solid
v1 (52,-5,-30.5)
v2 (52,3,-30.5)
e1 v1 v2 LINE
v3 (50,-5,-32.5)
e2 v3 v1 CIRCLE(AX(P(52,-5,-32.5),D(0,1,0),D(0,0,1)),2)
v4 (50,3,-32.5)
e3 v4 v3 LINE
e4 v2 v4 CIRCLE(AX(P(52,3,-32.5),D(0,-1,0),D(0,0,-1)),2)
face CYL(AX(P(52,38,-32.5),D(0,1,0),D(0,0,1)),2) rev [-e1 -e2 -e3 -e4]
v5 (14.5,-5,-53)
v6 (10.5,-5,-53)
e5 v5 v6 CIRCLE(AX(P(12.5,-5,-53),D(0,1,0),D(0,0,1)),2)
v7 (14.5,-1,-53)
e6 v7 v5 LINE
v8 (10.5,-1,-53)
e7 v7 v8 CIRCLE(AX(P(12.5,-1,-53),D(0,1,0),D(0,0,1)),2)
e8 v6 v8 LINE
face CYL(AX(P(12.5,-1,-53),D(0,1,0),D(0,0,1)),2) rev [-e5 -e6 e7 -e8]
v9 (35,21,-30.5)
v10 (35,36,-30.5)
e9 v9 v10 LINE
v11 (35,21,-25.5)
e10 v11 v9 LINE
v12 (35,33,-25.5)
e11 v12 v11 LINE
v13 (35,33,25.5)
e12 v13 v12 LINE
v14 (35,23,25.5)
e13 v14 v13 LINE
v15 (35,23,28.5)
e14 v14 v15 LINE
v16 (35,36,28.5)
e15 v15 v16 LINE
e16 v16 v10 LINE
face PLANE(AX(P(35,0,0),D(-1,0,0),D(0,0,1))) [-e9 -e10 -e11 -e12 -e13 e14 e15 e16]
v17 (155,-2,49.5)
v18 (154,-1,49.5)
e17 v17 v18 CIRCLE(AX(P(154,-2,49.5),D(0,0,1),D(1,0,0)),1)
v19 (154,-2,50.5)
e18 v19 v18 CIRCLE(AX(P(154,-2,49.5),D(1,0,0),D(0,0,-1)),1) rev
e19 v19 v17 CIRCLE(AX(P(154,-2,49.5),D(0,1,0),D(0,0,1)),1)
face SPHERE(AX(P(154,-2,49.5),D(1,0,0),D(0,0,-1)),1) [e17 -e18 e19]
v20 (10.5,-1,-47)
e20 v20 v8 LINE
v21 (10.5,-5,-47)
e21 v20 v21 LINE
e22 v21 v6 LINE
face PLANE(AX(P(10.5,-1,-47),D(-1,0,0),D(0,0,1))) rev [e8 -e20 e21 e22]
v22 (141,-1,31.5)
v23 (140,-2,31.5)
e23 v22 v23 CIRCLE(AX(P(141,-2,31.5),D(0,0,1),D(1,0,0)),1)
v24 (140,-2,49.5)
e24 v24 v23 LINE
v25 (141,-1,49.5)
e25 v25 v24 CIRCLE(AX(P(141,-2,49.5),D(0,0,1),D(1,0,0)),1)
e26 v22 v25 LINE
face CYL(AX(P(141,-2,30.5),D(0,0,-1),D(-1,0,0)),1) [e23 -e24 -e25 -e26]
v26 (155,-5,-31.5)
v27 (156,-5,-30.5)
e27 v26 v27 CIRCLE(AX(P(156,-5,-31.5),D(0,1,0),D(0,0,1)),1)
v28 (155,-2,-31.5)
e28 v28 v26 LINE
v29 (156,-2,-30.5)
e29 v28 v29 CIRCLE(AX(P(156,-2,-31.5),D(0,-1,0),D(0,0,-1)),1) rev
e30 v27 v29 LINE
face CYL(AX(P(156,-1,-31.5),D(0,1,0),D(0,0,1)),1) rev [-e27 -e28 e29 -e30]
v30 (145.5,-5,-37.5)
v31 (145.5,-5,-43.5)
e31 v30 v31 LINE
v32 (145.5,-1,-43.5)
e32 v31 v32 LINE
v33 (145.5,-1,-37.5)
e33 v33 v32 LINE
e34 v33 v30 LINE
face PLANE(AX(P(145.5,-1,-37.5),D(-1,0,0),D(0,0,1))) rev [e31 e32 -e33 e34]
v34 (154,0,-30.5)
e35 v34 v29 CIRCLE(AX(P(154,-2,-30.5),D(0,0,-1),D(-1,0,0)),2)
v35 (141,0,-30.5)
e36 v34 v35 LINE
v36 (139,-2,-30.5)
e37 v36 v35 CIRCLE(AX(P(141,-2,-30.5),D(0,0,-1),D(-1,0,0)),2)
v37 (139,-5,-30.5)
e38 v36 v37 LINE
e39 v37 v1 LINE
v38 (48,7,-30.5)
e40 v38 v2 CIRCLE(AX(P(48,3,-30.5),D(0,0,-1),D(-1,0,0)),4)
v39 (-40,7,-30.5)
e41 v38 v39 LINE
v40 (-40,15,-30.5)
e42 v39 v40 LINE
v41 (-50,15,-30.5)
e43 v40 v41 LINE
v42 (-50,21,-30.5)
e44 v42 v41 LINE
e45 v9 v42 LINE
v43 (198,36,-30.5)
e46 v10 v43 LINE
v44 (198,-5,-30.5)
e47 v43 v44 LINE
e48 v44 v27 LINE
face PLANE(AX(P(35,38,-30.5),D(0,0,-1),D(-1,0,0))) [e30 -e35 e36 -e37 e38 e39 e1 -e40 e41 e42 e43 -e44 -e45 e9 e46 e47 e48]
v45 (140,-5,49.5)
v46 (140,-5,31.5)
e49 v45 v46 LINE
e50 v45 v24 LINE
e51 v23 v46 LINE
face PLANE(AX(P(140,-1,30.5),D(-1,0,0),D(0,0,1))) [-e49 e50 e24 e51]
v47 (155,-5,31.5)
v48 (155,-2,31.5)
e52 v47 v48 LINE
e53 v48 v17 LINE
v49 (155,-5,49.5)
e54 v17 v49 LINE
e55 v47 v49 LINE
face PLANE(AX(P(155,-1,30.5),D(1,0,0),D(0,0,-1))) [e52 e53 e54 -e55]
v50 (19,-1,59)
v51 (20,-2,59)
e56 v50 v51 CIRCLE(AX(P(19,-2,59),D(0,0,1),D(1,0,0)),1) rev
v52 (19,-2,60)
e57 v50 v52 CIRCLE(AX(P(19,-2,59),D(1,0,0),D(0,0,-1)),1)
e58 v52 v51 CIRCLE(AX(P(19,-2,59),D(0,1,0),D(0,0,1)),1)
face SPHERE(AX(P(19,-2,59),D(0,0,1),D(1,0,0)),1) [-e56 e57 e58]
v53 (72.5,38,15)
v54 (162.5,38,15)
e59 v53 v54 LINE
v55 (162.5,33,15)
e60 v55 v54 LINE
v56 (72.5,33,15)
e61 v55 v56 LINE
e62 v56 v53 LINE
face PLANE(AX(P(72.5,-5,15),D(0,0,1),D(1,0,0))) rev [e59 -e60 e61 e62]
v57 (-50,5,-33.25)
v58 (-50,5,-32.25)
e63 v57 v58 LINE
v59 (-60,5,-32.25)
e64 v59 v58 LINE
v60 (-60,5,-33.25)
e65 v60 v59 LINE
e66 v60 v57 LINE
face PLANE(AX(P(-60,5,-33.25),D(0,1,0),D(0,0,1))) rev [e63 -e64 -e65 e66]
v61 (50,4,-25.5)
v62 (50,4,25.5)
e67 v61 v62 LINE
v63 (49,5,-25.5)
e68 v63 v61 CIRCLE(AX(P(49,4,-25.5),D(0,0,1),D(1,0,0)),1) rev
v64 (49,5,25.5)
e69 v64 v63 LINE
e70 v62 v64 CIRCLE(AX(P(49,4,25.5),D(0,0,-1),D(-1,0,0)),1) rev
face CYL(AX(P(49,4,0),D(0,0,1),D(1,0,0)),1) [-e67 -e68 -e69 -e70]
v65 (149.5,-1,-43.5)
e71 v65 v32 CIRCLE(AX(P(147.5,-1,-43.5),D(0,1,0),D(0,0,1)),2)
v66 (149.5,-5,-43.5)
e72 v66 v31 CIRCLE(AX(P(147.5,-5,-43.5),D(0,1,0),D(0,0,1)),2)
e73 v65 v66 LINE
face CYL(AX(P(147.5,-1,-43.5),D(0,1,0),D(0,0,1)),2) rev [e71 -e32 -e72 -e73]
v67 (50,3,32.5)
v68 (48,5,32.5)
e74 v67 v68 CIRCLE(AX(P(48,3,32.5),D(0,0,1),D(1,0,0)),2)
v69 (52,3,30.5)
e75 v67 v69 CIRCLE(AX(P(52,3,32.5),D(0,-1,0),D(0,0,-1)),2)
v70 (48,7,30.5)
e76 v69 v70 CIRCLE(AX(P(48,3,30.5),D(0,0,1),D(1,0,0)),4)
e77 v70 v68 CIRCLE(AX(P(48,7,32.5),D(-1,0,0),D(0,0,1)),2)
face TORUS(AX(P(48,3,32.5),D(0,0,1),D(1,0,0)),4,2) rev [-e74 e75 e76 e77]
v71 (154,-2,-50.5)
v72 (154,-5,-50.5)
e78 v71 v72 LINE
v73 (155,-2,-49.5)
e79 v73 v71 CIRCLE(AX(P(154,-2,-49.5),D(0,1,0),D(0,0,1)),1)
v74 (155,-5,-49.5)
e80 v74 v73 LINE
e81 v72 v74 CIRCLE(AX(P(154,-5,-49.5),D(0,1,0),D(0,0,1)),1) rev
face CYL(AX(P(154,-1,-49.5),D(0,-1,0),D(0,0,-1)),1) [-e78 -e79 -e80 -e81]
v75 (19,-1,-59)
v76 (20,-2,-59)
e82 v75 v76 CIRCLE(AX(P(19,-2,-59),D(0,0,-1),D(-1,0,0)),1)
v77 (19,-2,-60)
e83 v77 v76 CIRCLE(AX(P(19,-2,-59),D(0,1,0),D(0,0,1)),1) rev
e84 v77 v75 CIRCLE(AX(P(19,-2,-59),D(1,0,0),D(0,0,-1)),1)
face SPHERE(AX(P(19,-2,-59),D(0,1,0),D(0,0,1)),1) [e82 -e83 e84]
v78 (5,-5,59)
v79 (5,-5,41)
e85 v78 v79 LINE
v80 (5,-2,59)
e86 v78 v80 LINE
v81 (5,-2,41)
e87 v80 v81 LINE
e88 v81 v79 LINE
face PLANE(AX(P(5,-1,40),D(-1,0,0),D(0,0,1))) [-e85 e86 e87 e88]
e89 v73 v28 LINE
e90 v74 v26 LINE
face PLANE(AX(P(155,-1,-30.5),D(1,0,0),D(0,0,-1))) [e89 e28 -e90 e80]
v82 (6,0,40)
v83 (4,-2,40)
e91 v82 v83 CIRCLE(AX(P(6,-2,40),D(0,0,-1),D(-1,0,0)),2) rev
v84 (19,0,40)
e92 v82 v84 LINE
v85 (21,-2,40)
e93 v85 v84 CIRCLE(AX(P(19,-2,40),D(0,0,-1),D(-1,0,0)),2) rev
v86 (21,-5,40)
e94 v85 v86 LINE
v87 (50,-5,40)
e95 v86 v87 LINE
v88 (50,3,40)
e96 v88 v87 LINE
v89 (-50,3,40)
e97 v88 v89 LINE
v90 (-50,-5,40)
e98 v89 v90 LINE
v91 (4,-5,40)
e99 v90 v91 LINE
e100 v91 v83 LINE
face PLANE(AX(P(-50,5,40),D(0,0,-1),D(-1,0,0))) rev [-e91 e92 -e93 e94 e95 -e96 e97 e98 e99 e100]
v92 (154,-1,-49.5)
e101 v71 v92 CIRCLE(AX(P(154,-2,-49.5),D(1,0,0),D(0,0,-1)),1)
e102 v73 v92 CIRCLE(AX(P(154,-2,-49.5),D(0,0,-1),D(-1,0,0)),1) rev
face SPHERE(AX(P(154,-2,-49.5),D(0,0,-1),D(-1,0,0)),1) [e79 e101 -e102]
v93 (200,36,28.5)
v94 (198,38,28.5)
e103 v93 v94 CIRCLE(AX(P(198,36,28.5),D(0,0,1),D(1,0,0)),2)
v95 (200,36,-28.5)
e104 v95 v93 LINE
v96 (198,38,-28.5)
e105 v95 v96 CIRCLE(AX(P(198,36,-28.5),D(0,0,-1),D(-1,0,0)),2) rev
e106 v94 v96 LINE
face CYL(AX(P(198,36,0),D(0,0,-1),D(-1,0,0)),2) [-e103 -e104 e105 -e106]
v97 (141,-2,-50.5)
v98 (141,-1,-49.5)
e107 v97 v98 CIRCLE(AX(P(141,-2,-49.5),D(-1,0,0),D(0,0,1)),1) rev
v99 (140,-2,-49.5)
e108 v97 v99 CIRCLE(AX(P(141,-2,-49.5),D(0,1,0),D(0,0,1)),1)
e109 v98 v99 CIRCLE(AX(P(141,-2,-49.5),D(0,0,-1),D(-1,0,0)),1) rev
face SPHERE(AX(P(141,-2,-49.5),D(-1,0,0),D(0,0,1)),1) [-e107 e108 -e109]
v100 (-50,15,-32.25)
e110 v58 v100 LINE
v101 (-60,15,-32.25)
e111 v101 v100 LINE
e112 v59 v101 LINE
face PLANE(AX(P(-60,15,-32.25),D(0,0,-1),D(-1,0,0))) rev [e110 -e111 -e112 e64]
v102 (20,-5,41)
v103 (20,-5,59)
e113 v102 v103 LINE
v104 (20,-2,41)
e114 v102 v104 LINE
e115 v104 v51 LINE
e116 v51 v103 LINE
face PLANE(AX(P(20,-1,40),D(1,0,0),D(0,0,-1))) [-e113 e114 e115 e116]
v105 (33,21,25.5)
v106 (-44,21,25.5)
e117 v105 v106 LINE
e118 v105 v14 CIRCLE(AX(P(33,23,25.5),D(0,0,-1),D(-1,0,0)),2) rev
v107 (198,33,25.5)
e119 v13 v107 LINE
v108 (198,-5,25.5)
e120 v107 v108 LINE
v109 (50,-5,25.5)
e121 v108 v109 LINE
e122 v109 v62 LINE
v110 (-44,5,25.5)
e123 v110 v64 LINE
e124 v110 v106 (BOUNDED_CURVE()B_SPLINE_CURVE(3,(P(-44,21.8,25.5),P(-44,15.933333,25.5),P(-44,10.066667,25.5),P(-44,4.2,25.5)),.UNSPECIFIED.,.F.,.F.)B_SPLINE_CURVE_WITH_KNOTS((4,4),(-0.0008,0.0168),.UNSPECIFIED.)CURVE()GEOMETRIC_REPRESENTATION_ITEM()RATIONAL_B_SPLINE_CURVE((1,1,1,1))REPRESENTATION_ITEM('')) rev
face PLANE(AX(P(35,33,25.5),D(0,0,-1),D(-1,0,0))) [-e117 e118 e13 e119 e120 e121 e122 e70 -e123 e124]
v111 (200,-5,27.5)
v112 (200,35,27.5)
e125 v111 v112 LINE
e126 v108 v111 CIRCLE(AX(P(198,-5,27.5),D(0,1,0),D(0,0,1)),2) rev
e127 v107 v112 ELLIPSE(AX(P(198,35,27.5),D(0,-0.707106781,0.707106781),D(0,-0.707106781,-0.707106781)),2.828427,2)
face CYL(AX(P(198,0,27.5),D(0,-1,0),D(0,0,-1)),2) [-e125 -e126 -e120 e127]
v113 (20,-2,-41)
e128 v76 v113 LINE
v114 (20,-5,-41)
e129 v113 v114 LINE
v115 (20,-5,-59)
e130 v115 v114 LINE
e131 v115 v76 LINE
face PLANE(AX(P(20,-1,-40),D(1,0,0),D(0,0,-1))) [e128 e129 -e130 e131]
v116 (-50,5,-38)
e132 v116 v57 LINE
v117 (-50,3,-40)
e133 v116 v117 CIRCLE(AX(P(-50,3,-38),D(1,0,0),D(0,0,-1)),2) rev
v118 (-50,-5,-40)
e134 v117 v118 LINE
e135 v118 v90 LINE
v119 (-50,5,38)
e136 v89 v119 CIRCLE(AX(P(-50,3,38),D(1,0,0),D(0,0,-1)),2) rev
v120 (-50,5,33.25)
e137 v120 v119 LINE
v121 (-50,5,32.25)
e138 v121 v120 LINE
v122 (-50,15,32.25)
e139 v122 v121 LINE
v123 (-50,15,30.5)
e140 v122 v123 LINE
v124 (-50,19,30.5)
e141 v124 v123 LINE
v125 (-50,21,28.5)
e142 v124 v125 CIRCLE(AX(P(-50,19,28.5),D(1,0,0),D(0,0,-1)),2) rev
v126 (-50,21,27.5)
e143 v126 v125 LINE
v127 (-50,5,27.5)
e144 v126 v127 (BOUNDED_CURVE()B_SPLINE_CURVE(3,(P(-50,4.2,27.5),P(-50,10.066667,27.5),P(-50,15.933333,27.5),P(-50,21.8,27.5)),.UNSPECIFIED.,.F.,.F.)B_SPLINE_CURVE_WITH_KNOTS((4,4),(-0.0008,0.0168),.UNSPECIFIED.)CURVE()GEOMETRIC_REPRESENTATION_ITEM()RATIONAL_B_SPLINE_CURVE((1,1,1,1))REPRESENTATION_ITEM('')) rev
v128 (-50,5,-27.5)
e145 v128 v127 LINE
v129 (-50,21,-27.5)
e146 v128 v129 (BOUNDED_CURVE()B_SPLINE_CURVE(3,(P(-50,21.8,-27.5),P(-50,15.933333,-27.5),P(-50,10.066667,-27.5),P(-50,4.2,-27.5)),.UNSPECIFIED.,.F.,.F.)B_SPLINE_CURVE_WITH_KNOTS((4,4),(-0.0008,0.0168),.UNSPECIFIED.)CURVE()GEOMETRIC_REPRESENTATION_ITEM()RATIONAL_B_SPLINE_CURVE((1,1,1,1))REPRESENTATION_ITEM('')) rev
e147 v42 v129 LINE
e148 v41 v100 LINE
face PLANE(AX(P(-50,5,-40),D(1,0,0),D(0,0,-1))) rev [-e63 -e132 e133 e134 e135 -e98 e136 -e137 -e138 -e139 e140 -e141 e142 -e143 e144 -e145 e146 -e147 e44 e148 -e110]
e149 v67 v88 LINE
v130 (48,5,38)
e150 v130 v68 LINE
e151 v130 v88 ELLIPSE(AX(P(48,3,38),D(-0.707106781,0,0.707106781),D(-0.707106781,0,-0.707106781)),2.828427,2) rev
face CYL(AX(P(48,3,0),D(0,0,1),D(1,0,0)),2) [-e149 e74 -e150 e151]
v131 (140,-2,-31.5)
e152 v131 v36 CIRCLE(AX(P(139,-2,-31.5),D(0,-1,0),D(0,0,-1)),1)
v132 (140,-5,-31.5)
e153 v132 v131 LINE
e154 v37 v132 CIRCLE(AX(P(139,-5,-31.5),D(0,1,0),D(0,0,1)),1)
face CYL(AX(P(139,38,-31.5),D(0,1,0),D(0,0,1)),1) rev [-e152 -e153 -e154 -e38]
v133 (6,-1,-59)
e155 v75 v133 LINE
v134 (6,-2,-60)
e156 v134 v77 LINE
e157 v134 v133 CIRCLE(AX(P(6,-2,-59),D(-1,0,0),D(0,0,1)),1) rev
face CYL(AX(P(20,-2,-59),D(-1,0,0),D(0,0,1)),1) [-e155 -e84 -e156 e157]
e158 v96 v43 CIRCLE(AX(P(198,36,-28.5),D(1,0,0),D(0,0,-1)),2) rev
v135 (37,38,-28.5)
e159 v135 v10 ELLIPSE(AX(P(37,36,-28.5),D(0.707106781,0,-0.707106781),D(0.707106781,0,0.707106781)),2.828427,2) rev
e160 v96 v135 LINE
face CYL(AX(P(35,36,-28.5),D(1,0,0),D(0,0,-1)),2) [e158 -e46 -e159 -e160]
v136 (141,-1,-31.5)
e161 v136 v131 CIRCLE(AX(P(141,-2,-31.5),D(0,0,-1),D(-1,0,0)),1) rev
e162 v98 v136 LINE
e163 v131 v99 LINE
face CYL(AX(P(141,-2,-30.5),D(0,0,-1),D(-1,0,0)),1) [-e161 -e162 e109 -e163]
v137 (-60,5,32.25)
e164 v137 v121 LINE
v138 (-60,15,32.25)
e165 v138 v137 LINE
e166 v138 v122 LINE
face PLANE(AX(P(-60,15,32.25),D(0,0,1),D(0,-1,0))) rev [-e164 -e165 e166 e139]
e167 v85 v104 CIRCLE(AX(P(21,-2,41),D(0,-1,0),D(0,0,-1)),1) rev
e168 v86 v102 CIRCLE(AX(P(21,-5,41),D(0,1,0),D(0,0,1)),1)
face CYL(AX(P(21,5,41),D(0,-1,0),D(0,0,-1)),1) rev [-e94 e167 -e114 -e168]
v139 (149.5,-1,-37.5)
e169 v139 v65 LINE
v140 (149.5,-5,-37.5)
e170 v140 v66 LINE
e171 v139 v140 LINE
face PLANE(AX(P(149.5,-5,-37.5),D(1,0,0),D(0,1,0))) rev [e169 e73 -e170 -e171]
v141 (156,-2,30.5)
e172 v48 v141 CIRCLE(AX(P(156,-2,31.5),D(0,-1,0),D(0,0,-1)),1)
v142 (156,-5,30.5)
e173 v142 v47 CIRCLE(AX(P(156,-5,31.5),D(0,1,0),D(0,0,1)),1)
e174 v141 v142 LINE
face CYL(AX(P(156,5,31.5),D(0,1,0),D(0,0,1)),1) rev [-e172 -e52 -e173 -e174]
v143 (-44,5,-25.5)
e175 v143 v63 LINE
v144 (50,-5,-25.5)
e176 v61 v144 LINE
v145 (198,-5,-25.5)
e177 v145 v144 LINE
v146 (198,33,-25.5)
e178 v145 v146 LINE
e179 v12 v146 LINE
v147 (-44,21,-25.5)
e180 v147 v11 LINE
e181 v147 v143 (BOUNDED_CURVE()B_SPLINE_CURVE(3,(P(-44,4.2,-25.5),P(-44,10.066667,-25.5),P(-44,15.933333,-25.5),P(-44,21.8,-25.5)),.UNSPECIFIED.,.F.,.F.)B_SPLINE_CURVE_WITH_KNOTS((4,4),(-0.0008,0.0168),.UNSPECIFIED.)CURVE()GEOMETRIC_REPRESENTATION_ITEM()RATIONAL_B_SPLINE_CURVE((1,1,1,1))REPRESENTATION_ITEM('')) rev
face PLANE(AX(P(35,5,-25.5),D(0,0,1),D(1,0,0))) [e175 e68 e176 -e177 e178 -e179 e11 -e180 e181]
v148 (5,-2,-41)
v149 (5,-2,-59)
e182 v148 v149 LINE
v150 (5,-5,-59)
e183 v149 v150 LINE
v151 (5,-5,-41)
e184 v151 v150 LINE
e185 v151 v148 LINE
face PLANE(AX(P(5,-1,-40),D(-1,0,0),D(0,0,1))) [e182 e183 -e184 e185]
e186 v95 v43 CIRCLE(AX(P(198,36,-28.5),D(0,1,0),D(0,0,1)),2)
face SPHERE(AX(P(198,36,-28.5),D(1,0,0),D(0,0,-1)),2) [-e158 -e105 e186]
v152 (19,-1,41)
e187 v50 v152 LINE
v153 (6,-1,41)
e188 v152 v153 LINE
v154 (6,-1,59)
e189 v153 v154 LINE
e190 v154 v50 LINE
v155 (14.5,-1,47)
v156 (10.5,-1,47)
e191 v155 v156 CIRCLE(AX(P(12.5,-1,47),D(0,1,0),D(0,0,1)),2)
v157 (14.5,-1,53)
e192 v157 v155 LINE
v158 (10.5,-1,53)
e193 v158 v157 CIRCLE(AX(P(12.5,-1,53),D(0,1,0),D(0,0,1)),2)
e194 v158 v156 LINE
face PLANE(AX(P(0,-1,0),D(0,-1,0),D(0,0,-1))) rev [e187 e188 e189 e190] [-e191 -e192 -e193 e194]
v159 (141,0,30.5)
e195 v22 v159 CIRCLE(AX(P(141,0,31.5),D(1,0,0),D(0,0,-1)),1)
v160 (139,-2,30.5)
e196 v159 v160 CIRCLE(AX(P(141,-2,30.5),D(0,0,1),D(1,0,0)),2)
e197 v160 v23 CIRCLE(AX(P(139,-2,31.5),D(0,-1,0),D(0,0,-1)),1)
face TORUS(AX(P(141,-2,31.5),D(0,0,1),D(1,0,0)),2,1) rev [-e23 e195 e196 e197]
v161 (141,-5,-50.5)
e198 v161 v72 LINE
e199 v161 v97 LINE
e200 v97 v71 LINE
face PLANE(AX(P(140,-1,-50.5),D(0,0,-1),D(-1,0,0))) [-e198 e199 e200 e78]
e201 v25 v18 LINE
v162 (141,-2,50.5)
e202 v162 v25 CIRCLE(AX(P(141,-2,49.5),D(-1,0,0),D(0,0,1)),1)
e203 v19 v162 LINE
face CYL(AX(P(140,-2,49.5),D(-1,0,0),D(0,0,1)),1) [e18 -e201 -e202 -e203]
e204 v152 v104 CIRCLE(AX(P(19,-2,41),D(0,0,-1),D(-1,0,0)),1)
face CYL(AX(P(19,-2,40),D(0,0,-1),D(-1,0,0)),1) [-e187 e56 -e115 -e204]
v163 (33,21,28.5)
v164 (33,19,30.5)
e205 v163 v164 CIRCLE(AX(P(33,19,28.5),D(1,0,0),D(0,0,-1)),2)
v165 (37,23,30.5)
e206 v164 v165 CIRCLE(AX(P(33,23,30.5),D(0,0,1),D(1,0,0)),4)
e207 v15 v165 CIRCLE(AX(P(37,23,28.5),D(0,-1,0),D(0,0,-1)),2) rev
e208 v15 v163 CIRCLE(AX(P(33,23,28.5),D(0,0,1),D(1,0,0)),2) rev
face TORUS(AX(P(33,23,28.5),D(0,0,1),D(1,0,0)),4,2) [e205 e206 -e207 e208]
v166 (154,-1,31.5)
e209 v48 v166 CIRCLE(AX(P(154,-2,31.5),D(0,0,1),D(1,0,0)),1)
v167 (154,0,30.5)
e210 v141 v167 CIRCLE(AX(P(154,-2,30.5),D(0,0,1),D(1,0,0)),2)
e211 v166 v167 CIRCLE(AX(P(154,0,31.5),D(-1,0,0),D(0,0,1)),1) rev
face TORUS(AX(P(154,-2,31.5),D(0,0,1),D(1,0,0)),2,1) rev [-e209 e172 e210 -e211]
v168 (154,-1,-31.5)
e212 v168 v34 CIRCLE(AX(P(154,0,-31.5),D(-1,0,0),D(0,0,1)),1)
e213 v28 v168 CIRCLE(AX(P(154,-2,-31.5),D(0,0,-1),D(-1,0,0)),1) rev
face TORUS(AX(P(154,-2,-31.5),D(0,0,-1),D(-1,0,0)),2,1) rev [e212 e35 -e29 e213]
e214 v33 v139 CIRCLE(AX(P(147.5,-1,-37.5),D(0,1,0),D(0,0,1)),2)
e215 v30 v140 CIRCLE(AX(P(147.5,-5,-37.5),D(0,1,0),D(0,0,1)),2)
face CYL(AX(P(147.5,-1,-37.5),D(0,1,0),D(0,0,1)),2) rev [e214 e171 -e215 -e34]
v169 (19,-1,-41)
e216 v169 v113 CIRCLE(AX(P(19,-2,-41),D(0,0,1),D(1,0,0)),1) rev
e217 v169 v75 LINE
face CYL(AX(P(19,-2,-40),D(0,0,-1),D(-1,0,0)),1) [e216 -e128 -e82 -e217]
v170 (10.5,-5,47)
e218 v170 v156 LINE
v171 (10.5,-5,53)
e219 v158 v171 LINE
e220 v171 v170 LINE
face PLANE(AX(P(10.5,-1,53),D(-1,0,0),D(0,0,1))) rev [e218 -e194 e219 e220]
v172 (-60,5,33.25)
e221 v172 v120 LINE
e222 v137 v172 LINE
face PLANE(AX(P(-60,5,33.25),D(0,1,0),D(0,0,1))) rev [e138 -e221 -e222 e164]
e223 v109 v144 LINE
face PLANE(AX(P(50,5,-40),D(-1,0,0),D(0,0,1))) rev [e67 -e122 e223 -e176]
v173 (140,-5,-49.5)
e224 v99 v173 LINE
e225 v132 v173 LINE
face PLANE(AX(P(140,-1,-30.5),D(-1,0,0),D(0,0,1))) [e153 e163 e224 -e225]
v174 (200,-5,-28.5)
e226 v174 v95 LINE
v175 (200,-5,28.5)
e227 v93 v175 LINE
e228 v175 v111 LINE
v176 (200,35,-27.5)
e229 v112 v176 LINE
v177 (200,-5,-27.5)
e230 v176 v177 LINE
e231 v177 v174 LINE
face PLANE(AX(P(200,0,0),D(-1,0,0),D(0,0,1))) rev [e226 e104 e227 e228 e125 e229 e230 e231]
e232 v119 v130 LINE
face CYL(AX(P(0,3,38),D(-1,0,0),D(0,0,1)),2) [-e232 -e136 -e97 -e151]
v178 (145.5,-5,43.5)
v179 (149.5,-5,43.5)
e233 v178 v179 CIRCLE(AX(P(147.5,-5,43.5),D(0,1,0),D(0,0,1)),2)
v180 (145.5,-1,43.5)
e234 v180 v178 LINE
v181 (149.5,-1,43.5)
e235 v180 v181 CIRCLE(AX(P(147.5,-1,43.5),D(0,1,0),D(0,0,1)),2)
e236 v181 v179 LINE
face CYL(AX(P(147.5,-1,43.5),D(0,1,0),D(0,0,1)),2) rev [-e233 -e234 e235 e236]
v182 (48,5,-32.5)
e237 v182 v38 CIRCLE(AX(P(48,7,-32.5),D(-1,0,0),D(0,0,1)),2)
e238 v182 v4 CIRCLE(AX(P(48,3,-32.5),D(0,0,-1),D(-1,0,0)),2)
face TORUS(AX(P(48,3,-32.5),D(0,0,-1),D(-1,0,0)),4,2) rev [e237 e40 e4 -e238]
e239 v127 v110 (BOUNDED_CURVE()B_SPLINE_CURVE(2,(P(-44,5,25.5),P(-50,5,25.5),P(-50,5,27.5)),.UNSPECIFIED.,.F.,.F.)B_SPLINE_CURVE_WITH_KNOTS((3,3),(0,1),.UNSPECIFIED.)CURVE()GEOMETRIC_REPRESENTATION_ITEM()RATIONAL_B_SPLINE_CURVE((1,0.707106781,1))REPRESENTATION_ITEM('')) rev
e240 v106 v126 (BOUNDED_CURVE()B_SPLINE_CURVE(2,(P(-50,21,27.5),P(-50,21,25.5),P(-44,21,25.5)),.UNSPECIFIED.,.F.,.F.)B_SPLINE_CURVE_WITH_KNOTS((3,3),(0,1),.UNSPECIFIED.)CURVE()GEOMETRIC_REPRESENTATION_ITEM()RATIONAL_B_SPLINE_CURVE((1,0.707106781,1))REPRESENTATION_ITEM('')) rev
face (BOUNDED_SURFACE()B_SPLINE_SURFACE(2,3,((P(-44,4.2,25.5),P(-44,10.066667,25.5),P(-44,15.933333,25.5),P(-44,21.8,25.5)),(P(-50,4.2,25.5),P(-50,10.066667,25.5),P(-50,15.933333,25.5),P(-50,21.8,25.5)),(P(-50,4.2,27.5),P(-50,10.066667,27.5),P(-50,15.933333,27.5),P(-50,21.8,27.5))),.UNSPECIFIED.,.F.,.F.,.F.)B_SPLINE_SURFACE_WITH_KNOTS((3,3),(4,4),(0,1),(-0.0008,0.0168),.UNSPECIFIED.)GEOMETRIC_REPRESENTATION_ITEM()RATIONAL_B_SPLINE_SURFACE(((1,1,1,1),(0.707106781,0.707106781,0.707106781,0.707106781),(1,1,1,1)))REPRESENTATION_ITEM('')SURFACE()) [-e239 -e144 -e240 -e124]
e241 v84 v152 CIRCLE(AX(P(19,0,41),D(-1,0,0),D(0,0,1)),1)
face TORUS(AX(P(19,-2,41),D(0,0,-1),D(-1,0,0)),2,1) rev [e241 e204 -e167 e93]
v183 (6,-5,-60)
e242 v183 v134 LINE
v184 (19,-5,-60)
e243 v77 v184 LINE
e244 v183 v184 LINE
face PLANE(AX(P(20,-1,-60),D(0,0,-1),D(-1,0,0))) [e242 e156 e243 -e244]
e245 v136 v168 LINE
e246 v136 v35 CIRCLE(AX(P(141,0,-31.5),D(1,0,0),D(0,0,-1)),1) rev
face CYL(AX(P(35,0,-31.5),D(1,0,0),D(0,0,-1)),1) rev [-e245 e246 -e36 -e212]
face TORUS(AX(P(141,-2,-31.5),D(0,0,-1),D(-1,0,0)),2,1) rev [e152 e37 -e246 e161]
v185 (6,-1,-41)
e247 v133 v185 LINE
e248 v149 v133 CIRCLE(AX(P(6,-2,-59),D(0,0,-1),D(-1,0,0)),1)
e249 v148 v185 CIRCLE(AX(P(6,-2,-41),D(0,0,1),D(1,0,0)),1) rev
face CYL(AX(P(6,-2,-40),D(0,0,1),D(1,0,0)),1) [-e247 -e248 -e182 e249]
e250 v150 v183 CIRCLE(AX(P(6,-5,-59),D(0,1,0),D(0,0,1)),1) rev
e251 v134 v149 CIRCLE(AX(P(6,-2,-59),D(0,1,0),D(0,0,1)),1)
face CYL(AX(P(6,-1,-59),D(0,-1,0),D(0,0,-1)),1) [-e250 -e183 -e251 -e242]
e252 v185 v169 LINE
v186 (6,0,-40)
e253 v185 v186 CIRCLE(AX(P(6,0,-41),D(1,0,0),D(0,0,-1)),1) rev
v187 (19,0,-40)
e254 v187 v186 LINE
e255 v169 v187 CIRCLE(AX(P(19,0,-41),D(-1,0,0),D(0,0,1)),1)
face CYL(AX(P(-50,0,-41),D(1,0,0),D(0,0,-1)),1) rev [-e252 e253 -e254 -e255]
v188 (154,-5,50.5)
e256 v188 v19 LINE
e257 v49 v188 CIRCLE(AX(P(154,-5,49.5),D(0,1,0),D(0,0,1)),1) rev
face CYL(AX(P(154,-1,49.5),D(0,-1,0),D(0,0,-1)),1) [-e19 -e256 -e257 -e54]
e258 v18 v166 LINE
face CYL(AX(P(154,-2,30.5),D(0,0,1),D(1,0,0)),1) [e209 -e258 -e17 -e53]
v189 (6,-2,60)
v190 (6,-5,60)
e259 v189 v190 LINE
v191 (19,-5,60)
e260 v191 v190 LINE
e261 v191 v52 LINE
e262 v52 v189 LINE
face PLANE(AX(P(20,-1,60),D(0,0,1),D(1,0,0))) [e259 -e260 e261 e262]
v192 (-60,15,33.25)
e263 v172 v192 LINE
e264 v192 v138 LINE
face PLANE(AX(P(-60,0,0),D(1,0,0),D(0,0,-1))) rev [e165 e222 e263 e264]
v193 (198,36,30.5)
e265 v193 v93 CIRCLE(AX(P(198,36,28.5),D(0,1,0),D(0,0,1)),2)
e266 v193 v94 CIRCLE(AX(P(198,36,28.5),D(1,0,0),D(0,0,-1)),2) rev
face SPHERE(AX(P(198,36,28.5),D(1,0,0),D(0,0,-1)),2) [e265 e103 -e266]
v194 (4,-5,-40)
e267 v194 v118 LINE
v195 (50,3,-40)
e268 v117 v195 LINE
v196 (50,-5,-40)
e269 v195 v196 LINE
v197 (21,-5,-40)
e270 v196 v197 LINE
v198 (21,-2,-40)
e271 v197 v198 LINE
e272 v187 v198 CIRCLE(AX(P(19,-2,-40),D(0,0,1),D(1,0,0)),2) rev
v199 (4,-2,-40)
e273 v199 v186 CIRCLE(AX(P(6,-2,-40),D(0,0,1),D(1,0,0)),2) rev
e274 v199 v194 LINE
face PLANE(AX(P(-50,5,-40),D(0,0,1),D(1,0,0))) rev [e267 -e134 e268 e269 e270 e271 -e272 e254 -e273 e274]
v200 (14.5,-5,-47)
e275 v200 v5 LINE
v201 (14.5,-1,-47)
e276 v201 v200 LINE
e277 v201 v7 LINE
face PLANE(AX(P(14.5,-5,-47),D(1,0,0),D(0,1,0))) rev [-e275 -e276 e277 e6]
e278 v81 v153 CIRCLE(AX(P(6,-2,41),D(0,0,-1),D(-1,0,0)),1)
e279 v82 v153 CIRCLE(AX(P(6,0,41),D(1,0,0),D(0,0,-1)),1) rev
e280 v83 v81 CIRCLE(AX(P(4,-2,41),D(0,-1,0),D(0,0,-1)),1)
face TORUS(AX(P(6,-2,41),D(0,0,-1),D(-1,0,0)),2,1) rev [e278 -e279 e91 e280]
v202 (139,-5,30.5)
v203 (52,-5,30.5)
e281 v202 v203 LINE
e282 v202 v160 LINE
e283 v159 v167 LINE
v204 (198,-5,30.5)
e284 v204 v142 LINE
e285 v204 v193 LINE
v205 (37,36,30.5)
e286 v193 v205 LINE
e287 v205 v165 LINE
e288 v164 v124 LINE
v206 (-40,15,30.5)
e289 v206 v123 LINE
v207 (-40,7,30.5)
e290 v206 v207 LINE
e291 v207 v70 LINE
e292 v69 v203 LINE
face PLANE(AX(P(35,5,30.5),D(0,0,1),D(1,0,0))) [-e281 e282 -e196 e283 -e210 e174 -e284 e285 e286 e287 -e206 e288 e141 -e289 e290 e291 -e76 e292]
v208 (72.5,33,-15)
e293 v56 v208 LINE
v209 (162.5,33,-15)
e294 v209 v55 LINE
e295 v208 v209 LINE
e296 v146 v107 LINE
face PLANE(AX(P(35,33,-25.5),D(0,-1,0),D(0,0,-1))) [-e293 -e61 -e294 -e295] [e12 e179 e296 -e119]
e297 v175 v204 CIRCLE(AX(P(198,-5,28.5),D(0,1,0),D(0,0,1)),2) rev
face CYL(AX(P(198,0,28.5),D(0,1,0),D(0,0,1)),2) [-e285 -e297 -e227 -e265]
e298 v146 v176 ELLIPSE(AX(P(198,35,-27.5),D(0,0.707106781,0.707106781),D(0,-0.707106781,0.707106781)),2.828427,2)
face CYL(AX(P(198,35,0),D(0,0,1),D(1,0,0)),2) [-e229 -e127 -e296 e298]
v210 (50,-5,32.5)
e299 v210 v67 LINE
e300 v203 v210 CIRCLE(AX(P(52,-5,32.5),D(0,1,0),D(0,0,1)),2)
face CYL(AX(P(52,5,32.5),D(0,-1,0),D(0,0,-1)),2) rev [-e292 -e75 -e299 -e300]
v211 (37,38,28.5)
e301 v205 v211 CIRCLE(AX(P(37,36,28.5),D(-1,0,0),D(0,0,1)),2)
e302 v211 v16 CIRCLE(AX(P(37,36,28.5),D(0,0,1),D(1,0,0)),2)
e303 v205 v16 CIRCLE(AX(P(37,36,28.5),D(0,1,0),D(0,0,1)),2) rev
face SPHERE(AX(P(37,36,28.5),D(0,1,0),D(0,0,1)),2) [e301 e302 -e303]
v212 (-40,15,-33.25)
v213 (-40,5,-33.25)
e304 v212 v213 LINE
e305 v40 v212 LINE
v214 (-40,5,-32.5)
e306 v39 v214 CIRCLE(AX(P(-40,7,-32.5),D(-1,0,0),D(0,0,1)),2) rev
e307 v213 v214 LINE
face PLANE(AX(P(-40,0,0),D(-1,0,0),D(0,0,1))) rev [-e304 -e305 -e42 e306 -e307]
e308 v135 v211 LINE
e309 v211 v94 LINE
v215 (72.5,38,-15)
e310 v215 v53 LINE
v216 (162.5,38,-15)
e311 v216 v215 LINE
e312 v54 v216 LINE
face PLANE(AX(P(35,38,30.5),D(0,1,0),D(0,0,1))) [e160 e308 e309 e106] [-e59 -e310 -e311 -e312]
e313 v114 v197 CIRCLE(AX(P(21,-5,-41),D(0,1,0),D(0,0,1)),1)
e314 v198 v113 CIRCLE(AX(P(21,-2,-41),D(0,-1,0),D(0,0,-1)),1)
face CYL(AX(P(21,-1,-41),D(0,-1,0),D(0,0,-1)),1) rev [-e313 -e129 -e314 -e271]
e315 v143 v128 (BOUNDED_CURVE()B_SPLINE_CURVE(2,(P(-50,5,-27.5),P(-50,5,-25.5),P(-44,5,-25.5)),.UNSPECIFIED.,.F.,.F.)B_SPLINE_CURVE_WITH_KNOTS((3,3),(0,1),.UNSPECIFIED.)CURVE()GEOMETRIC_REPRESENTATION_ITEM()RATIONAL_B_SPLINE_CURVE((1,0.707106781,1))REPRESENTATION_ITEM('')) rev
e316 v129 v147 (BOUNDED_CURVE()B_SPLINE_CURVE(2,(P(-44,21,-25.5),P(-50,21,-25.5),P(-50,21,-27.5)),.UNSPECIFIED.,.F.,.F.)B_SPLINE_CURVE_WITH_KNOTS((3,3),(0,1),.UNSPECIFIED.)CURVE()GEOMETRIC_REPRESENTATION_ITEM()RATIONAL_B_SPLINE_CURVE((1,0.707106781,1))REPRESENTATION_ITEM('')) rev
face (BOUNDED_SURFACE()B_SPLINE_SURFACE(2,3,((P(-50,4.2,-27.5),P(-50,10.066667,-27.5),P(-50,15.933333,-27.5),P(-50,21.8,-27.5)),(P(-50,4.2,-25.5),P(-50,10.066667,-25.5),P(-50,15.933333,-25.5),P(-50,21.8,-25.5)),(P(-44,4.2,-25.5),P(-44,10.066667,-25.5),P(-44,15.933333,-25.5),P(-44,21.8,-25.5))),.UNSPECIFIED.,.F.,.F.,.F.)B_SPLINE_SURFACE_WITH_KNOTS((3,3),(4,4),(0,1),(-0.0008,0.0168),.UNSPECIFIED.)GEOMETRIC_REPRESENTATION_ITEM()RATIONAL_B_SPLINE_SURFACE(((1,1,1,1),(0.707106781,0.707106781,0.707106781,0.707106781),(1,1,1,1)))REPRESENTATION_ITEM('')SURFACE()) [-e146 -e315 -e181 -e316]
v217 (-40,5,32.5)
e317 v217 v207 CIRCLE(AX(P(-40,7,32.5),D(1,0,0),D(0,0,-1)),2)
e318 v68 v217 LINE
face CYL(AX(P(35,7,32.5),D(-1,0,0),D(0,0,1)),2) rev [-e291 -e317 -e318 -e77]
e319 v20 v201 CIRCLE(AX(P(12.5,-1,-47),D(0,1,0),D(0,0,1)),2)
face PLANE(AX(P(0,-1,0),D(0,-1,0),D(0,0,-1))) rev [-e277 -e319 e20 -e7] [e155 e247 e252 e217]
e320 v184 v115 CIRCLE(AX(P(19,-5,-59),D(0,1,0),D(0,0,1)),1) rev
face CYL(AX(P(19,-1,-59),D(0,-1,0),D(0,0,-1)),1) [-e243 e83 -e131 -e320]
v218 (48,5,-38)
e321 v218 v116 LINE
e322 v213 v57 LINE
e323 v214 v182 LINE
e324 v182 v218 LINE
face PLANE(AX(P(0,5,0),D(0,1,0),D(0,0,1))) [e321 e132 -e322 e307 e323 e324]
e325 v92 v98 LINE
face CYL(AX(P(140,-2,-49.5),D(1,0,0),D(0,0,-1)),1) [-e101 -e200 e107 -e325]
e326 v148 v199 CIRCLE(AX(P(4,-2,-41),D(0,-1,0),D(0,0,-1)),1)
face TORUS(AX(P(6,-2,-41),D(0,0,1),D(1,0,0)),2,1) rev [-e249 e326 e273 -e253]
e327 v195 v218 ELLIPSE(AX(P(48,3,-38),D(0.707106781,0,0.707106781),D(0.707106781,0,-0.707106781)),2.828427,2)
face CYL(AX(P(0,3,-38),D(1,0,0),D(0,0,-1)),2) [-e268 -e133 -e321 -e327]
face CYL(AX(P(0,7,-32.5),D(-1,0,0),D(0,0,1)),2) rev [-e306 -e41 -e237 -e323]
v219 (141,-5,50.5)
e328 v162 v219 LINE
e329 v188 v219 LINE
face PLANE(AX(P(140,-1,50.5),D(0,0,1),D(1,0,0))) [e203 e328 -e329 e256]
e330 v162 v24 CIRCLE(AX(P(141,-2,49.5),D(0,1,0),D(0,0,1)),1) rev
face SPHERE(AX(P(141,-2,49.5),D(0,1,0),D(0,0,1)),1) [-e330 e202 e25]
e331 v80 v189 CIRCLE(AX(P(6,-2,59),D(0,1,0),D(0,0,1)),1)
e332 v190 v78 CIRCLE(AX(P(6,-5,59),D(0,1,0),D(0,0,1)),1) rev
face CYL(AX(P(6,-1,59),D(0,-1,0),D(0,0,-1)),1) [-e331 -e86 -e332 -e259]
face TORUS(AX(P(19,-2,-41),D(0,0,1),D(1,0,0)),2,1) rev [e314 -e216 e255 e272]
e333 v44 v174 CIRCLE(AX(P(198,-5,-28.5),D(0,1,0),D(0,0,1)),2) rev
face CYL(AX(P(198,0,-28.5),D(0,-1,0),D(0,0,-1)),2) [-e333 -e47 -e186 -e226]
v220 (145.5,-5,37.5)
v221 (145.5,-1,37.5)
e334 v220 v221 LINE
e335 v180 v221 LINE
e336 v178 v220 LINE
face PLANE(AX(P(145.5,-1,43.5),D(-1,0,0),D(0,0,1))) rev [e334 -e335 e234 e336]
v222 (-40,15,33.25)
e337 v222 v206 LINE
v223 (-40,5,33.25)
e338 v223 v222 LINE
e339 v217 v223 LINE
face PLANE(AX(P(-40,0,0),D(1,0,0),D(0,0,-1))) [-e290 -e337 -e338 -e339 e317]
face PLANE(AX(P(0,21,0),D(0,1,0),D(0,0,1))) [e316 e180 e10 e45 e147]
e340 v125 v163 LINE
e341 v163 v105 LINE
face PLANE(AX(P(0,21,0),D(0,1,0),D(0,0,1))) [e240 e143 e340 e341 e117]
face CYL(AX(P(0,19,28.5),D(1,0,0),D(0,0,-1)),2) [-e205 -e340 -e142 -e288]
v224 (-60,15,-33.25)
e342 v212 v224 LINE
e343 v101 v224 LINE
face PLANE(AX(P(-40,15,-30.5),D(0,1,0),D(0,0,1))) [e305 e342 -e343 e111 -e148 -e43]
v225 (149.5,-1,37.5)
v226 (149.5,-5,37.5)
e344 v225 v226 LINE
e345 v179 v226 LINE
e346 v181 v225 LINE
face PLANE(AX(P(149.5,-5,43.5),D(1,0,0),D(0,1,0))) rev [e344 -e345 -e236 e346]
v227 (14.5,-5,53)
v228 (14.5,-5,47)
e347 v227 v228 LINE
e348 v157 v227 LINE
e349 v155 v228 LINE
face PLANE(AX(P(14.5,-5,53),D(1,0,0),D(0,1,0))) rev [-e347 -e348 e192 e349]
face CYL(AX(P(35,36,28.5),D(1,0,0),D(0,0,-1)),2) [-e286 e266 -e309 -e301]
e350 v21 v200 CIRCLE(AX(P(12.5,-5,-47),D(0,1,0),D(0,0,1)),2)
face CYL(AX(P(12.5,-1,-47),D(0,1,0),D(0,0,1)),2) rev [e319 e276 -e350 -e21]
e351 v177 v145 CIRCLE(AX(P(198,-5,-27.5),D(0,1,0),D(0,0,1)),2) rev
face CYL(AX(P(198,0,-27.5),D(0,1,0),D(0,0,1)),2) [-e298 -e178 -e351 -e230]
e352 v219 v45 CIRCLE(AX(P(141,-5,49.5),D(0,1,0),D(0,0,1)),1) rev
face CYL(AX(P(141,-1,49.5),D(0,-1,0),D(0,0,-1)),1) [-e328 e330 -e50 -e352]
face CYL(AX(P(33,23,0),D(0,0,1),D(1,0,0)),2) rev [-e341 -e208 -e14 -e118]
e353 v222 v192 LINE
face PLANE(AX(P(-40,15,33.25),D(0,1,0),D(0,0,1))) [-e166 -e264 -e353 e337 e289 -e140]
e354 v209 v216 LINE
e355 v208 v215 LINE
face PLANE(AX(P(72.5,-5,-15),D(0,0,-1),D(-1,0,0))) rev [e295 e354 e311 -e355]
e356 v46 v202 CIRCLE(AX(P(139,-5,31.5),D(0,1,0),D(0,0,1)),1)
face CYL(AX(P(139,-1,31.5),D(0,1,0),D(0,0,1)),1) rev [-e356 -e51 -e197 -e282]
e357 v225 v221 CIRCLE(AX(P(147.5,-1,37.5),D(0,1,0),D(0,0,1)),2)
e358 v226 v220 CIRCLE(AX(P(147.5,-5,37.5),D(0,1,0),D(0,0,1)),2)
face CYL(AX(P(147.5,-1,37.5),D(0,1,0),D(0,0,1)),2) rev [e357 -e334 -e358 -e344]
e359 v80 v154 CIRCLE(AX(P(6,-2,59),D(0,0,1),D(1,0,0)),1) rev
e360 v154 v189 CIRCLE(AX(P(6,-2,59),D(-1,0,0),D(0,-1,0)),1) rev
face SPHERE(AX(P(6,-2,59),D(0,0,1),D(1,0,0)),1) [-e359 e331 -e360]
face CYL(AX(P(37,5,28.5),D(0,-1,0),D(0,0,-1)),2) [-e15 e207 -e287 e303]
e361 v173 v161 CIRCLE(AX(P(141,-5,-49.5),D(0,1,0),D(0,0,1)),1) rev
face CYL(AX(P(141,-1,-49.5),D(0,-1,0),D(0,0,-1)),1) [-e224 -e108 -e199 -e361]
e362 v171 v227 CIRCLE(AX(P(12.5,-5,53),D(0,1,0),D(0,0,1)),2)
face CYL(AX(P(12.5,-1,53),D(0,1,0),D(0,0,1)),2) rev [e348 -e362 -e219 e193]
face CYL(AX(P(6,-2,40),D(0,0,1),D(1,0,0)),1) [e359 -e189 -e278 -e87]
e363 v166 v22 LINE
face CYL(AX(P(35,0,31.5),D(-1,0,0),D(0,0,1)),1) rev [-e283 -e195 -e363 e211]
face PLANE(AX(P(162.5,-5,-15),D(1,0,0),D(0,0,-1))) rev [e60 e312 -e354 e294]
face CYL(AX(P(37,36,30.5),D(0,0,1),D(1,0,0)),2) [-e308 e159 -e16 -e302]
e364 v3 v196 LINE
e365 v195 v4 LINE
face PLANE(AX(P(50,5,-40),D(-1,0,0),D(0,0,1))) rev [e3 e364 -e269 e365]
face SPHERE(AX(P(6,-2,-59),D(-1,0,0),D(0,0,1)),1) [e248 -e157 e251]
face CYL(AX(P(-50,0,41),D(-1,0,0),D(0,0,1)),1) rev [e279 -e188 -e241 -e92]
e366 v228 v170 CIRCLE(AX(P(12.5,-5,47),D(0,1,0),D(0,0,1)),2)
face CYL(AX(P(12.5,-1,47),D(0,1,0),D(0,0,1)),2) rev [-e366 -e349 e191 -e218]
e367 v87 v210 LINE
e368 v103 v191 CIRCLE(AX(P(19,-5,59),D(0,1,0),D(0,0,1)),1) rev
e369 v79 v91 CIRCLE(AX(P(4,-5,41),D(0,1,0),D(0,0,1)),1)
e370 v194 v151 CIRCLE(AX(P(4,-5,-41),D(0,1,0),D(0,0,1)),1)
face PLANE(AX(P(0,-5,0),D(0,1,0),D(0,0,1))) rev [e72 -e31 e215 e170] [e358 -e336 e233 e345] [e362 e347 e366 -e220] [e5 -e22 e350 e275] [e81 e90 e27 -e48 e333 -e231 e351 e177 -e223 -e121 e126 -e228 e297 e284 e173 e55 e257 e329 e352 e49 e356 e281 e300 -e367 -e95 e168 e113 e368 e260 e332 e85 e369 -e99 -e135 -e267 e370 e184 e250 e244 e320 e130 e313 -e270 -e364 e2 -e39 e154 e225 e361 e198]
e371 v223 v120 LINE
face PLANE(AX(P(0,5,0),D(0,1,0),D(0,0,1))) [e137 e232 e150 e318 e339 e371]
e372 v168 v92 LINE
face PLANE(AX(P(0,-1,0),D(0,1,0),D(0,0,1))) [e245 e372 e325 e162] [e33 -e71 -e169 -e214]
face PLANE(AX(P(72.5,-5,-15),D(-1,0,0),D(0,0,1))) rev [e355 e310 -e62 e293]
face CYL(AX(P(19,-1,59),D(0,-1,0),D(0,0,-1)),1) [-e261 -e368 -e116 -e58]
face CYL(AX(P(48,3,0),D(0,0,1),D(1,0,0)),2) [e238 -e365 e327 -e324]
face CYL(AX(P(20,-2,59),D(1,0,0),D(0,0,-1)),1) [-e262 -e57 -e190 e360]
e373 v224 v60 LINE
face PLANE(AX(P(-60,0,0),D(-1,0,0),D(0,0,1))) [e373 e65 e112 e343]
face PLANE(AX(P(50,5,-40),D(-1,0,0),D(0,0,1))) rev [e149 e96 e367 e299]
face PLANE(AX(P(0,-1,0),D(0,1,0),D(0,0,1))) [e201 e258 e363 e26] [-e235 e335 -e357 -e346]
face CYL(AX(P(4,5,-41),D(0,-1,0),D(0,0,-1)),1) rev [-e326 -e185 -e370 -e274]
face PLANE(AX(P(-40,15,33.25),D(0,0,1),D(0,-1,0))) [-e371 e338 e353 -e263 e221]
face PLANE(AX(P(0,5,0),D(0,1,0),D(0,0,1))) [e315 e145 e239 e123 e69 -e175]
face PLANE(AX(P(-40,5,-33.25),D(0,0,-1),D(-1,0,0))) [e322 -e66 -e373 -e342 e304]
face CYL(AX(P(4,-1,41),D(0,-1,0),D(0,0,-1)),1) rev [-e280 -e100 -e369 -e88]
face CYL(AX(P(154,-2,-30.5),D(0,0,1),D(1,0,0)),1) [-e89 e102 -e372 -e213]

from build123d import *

# Parameters (mm, degrees)
SKETCH1_W                 = 100
SKETCH1_H                 = 80
BOSS_EXTRUDE1_DEPTH       = 5
BOSS_EXTRUDE2_DEPTH       = 15
BOSS_EXTRUDE4_DEPTH       = 150
SKETCH9_W                 = 85
SKETCH9_H                 = 5
BOSS_EXTRUDE5_DEPTH       = 16
SKETCH3_W                 = 15
SKETCH3_H                 = 20
BOSS_EXTRUDE3_DEPTH       = 4
F_4_0MM_START             = -5
F_4_0MM_DOWEL_SLOT1_DEPTH = 4
SKETCH12_W                = 2.75
SKETCH12_H                = 10
BOSS_EXTRUDE7_DEPTH       = 10
SKETCH13_W                = 1
SKETCH13_H                = 10
BOSS_EXTRUDE8_DEPTH       = 10
SKETCH14_W                = 90
SKETCH14_H                = 30
CUT_EXTRUDE1_DEPTH        = 214.187710715
FILLET2_R                 = 2
FILLET3_R                 = 1
FILLET4_SIZE              = 2
FILLET4_SIZE_2            = 6


# Read off the part's stored shape, not the designer's step: Ø4.0mm Dowel Slot1
with BuildPart() as part:
    # Sketch1 → Boss-Extrude1 (new, symmetric)
    with BuildSketch(Plane(origin=(0, 0, 0), x_dir=(1, 0, 0), z_dir=(0, 1, 0))):
        Rectangle(SKETCH1_W, SKETCH1_H)
    extrude(amount=BOSS_EXTRUDE1_DEPTH, both=True)

    # Sketch2 → Boss-Extrude2 (add)
    with BuildSketch(Plane(origin=(50, 0, 0), x_dir=(0, 0, -1), z_dir=(1, 0, 0))):
        Polygon((-30.5, 5), (-30.5, 38), (30.5, 38), (30.5, 5), (25.5, 5), (25.5, 33), (-25.5, 33), (-25.5, 5), align=None)
    extrude(amount=-BOSS_EXTRUDE2_DEPTH)

    # Sketch4 → Boss-Extrude4 (add)
    with BuildSketch(Plane(origin=(50, 0, 0), x_dir=(0, 0, -1), z_dir=(1, 0, 0))):
        Polygon((-30.5, 38), (30.5, 38), (30.5, -5), (25.5, -5), (25.5, 33), (-25.5, 33), (-25.5, -5), (-30.5, -5), align=None)
    extrude(amount=BOSS_EXTRUDE4_DEPTH)

    # Sketch9 → Boss-Extrude5 (add)
    with BuildSketch(Plane(origin=(0, 5, 0), x_dir=(1, 0, 0), z_dir=(0, 1, 0))):
        with Locations((-7.5, -28)):
            Rectangle(SKETCH9_W, SKETCH9_H)
        with Locations((-7.5, 28)):
            Rectangle(SKETCH9_W, SKETCH9_H)
    extrude(amount=BOSS_EXTRUDE5_DEPTH)

    # Sketch3 → Boss-Extrude3 (add)
    with BuildSketch(Plane.XZ.offset(5)):
        with Locations((12.5, 50)):
            Rectangle(SKETCH3_W, SKETCH3_H)
        with Locations((147.5, 40.5)):
            Rectangle(SKETCH3_W, SKETCH3_H)
        with Locations((147.5, -40.5)):
            Rectangle(SKETCH3_W, SKETCH3_H)
        with Locations((12.5, -50)):
            Rectangle(SKETCH3_W, SKETCH3_H)
    extrude(amount=-BOSS_EXTRUDE3_DEPTH)

    # Ø4.0mm Dowel Slot1 outline → Ø4.0mm Dowel Slot1 (cut)
    with BuildSketch(Plane(origin=(0, 0, 0), x_dir=(1, 0, 0), z_dir=(0, 1, 0)).offset(F_4_0MM_START)):
        with BuildLine():
            Line((149.5, 37.5), (149.5, 43.5))
            ThreePointArc((149.5, 43.5), (147.5, 45.5), (145.5, 43.5))
            Line((145.5, 43.5), (145.5, 37.5))
            ThreePointArc((145.5, 37.5), (147.5, 35.5), (149.5, 37.5))
        make_face()
        with BuildLine():
            ThreePointArc((149.5, -37.5), (147.5, -35.5), (145.5, -37.5))
            Line((145.5, -37.5), (145.5, -43.5))
            ThreePointArc((145.5, -43.5), (147.5, -45.5), (149.5, -43.5))
            Line((149.5, -43.5), (149.5, -37.5))
        make_face()
        with BuildLine():
            Line((14.5, -53), (14.5, -47))
            ThreePointArc((14.5, -47), (12.5, -45), (10.5, -47))
            Line((10.5, -47), (10.5, -53))
            ThreePointArc((10.5, -53), (12.5, -55), (14.5, -53))
        make_face()
        with BuildLine():
            ThreePointArc((14.5, 53), (12.5, 55), (10.5, 53))
            Line((10.5, 53), (10.5, 47))
            ThreePointArc((10.5, 47), (12.5, 45), (14.5, 47))
            Line((14.5, 47), (14.5, 53))
        make_face()
    extrude(amount=F_4_0MM_DOWEL_SLOT1_DEPTH, mode=Mode.SUBTRACT)

    # Sketch12 → Boss-Extrude7 (add)
    with BuildSketch(Plane.ZY.offset(50)):
        with Locations((-31.875, 10)):
            Rectangle(SKETCH12_W, SKETCH12_H)
        with Locations((31.875, 10)):
            Rectangle(SKETCH12_W, SKETCH12_H)
    extrude(amount=-BOSS_EXTRUDE7_DEPTH)

    # Sketch13 → Boss-Extrude8 (add)
    with BuildSketch(Plane.ZY.offset(50)):
        with Locations((32.75, 10)):
            Rectangle(SKETCH13_W, SKETCH13_H)
        with Locations((-32.75, 10)):
            Rectangle(SKETCH13_W, SKETCH13_H)
    extrude(amount=BOSS_EXTRUDE8_DEPTH)

    # Sketch14 → Cut-Extrude1 (cut, through all)
    with BuildSketch(Plane(origin=(0, 38, 0), x_dir=(1, 0, 0), z_dir=(0, 1, 0))):
        with Locations((117.5, 0)):
            Rectangle(SKETCH14_W, SKETCH14_H)
    extrude(amount=-CUT_EXTRUDE1_DEPTH, mode=Mode.SUBTRACT)

    # Fillet2
    fillet2_edges = [part.edges().sort_by_distance(p)[0] for p in [
        (0, 5, 40),
        (50, 5, -35.25),
        (5, 5, -30.5),
        (5, 5, 30.5),
        (35, 29.5, 30.5),
        (35, 38, 0),
        (117.5, 38, 30.5),
        (117.5, 38, -30.5),
        (50, 0, 30.5),
        (50, 0, -30.5),
        (50, 5, 35.25),
        (200, 16.5, 30.5),
        (200, 14, 25.5),
        (200, 33, 0),
        (200, 14, -25.5),
        (200, 16.5, -30.5),
        (200, 38, 0),
        (35, 21, 28),
        (-7.5, 21, 30.5),
        (0, 5, -40),
    ]]
    fillet(fillet2_edges, radius=FILLET2_R)

    # Fillet3
    fillet3_edges = [part.edges().sort_by_distance(p)[0] for p in [
        (20, -1, 50),
        (20, -3, 60),
        (12.5, -1, 40),
        (20, -3, 40),
        (5, -1, 50),
        (5, -3, 40),
        (12.5, -1, 60),
        (5, -3, 60),
        (140, -1, 40.5),
        (140, -3, 30.5),
        (147.5, -1, 50.5),
        (140, -3, 50.5),
        (155, -1, 40.5),
        (155, -3, 50.5),
        (147.5, -1, 30.5),
        (155, -3, 30.5),
        (147.5, -1, -30.5),
        (140, -3, -30.5),
        (155, -1, -40.5),
        (155, -3, -30.5),
        (147.5, -1, -50.5),
        (155, -3, -50.5),
        (140, -1, -40.5),
        (140, -3, -50.5),
        (12.5, -1, -40),
        (5, -3, -40),
        (20, -1, -50),
        (20, -3, -40),
        (12.5, -1, -60),
        (20, -3, -60),
        (5, -1, -50),
        (5, -3, -60),
        (50, 5, 0),
    ]]
    fillet(fillet3_edges, radius=FILLET3_R)

    # Fillet4
    # an asymmetric fillet: 6, 2 mm, written as the material it takes off along each edge
    with BuildSketch(Plane(origin=(-50, 5, 25.5), x_dir=(0, 0, 1), z_dir=(0, 1, 0))) as fillet4_piece_1:
        with BuildLine():
            Bezier((FILLET4_SIZE, 0), (0, 0), (0, FILLET4_SIZE_2), weights=[1, 0.707106781, 1])
            Line((0, FILLET4_SIZE_2), (0, 0))
            Line((0, 0), (FILLET4_SIZE, 0))
        make_face()
    extrude(amount=31, mode=Mode.SUBTRACT)
    with BuildSketch(Plane(origin=(-50, 5, -25.5), x_dir=(0, 0, -1), z_dir=(0, 1, 0))) as fillet4_piece_2:
        with BuildLine():
            Bezier((FILLET4_SIZE, 0), (0, 0), (0, -FILLET4_SIZE_2), weights=[1, 0.707106781, 1])
            Line((0, -FILLET4_SIZE_2), (0, 0))
            Line((0, 0), (FILLET4_SIZE, 0))
        make_face()
    extrude(amount=31, mode=Mode.SUBTRACT)


solid = part.part
